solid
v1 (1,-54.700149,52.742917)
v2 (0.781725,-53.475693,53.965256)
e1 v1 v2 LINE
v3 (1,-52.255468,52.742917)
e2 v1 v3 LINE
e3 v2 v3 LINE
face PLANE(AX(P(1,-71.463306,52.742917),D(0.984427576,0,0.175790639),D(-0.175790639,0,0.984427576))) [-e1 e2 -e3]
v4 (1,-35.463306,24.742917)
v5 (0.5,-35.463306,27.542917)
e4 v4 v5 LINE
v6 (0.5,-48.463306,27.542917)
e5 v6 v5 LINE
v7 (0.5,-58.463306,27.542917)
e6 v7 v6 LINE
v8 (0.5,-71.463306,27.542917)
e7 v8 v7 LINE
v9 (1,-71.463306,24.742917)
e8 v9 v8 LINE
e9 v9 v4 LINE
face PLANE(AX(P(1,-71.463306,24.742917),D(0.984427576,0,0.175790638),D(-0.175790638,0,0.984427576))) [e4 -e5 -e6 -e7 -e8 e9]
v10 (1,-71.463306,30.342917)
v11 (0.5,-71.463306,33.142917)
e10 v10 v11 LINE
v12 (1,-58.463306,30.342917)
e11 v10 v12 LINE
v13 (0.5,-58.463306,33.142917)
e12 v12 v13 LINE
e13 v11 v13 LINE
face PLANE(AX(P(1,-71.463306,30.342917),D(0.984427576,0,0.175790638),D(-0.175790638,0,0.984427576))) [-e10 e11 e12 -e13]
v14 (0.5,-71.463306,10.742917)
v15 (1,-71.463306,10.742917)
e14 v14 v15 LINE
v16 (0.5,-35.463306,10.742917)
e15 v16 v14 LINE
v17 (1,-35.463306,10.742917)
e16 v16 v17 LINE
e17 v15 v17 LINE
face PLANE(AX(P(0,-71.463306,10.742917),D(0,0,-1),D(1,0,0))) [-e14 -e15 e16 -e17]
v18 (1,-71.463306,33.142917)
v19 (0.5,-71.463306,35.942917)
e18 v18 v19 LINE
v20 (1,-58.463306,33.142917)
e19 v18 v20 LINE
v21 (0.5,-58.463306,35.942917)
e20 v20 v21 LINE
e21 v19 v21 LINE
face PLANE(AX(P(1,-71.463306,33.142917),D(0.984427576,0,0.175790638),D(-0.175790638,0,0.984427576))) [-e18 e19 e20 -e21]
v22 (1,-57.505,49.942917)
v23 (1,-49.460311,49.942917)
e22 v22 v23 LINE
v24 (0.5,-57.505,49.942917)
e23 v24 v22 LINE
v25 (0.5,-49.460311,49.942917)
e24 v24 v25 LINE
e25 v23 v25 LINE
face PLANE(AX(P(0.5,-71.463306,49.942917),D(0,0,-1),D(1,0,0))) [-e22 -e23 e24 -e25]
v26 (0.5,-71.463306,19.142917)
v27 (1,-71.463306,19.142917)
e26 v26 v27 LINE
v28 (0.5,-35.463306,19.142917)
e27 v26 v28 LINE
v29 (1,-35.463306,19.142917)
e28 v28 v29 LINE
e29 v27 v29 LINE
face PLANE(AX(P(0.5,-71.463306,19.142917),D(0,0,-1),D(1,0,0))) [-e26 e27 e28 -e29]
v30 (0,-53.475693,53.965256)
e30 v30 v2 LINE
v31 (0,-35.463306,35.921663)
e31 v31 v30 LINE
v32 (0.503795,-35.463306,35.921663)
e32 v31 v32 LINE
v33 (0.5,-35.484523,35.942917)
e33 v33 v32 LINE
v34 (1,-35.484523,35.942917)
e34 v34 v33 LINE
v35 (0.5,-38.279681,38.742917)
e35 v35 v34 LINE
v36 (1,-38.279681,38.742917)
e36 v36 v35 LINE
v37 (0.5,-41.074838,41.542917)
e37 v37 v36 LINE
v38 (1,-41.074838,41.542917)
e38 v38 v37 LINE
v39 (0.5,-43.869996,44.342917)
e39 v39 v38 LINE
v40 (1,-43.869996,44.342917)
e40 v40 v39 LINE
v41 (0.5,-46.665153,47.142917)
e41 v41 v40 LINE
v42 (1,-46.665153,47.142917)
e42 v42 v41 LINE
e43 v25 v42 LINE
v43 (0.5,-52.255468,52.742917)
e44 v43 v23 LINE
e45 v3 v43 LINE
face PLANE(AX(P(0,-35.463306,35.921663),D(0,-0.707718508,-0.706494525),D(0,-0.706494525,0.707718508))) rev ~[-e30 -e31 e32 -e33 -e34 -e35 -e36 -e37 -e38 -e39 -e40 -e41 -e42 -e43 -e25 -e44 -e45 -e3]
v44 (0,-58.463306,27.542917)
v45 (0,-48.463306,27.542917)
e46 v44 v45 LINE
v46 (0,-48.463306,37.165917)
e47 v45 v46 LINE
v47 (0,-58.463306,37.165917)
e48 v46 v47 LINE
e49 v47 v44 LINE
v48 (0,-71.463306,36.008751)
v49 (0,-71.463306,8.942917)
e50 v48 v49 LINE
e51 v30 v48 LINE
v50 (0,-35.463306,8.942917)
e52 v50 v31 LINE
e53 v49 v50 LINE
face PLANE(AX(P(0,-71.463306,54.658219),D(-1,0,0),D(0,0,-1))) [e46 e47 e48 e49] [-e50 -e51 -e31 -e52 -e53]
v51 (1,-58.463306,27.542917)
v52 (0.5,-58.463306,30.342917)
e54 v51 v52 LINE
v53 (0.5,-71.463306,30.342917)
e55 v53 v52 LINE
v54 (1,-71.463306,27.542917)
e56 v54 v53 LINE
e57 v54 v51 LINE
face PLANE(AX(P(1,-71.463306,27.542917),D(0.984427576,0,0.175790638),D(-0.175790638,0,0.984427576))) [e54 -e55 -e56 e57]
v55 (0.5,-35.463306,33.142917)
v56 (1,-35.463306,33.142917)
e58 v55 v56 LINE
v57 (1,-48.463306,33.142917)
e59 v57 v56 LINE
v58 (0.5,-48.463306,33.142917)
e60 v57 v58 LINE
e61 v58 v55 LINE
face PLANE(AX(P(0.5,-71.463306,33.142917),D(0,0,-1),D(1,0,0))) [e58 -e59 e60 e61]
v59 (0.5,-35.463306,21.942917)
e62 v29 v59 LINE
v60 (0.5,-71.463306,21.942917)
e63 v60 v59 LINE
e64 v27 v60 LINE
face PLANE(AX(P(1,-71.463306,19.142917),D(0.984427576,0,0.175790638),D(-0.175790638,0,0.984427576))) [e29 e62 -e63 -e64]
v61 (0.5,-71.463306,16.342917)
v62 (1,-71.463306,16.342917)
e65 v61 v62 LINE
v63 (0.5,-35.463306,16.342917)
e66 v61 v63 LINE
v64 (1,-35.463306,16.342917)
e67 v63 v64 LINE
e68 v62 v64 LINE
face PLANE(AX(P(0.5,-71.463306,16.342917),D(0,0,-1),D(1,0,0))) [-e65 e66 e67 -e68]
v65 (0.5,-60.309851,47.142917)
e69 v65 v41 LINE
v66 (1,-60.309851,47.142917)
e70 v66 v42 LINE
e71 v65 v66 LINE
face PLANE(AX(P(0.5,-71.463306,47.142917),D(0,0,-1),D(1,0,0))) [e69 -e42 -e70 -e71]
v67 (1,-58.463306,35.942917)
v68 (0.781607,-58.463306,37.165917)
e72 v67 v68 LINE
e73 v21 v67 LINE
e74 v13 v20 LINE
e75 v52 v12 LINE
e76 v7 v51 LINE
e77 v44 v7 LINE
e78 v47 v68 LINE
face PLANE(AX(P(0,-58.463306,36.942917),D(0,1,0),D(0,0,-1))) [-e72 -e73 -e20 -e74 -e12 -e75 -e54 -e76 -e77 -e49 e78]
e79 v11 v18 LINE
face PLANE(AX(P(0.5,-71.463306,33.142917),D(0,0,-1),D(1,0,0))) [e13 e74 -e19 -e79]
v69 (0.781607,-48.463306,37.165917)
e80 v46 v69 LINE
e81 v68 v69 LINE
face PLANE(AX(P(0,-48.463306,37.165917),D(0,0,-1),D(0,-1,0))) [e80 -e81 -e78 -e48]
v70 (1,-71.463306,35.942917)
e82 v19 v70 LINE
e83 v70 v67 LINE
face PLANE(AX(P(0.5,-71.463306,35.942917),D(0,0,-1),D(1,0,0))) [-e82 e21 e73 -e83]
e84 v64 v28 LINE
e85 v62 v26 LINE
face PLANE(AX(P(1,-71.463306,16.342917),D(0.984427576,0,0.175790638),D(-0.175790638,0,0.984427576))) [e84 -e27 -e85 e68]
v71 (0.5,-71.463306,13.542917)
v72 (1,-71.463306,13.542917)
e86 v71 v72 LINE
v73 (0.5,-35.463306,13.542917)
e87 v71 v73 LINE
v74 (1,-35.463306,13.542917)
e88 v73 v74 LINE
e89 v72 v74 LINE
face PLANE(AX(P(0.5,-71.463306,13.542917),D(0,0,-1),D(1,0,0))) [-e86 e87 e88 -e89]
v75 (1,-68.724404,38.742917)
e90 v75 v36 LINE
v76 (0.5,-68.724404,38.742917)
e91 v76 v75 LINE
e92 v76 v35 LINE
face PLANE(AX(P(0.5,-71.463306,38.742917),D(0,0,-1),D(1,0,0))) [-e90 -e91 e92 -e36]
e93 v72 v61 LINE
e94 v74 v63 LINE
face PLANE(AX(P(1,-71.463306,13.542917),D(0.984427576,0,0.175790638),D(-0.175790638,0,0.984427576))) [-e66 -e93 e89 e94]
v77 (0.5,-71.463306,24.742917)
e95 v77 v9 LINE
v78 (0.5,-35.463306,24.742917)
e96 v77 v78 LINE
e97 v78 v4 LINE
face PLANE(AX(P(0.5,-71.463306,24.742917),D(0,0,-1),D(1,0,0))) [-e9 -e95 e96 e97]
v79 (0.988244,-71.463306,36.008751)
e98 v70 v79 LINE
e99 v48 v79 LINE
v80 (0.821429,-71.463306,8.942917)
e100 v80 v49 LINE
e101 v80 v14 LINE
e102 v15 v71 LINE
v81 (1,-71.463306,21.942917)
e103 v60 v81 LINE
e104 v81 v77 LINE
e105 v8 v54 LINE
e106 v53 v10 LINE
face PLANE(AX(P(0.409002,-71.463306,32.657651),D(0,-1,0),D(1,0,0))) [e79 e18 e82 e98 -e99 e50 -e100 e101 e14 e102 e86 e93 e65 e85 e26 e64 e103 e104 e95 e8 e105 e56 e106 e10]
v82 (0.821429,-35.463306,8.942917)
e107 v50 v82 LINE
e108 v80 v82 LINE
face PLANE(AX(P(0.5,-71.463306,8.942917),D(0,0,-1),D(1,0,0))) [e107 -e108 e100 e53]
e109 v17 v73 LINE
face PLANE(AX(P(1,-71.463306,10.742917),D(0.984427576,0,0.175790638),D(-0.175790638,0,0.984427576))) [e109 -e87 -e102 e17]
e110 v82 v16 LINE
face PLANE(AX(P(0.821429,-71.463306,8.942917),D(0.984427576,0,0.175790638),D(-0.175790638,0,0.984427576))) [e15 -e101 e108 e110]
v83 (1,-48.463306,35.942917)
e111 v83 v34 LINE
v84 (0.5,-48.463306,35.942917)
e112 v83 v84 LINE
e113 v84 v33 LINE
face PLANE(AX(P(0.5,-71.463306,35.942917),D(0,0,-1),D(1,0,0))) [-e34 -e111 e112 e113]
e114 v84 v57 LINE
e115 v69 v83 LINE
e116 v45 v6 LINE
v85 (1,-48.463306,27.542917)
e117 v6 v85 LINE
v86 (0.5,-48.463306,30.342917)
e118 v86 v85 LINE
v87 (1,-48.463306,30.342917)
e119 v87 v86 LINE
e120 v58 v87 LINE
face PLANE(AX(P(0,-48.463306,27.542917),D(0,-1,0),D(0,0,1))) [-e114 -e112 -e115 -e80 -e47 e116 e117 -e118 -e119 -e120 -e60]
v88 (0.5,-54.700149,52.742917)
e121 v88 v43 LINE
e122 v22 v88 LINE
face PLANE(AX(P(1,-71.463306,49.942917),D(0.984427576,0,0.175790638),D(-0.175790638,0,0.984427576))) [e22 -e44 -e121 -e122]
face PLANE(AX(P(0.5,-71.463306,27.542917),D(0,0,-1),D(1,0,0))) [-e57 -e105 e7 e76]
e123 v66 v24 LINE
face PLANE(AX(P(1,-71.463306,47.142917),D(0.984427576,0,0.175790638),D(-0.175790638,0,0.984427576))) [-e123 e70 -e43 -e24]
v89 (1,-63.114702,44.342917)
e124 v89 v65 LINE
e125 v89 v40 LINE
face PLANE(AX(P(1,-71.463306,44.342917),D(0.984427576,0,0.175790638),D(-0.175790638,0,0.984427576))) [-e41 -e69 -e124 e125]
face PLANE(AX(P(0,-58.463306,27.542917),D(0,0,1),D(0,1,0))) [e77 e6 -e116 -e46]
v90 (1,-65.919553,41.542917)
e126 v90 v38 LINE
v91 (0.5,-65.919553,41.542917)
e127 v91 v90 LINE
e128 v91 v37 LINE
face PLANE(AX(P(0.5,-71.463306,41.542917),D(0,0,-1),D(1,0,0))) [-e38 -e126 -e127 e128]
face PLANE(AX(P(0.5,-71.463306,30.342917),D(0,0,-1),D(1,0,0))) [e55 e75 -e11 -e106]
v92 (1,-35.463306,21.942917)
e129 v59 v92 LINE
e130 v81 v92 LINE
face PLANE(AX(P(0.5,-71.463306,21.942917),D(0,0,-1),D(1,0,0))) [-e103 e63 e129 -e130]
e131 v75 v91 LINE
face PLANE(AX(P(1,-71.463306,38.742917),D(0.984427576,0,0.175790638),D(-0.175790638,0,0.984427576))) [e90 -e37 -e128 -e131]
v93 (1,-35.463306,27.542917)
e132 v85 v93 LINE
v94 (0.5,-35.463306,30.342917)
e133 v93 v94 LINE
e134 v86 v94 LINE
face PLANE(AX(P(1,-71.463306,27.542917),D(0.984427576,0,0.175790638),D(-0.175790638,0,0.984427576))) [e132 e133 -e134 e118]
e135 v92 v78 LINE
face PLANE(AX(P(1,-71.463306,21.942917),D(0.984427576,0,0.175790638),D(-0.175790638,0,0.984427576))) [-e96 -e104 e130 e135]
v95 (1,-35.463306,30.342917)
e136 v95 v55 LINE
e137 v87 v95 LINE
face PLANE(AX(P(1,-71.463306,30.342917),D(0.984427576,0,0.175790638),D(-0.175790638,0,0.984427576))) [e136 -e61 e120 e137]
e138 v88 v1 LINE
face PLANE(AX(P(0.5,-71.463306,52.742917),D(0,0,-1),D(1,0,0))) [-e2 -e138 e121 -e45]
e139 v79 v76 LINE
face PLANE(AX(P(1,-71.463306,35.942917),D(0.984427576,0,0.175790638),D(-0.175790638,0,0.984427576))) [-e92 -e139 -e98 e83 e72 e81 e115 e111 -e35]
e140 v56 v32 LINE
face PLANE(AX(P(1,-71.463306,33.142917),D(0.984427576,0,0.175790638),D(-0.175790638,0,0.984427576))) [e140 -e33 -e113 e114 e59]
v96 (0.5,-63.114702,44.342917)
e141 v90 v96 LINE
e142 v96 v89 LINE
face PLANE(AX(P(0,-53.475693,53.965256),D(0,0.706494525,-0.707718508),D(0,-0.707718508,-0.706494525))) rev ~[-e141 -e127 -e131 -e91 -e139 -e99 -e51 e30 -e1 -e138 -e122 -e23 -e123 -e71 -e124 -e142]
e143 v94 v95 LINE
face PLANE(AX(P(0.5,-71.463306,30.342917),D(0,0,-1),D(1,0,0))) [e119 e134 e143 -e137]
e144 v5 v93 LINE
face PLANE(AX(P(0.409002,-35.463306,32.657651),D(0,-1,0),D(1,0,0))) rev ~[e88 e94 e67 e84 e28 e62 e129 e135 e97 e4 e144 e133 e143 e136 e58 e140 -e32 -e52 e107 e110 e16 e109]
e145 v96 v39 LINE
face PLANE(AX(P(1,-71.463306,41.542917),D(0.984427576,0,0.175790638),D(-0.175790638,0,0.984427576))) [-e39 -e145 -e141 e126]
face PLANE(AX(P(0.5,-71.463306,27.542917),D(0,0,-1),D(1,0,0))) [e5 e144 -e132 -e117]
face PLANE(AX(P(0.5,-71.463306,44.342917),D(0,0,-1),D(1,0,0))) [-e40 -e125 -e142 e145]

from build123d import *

# Parameters (mm, degrees)
F1_DEPTH = 0.5
F3_DEPTH = 36
F4_DEPTH = 36
F5_DEPTH = 25
F7_DEPTH = 25
F8_DEPTH = 0.223


with BuildPart() as f1:
    # F0 (on Right) → F1 (new body)
    with BuildSketch(Plane.YZ):
        Polygon((-35.463306278, 10.7429168718), (-71.463306278, 10.7429168718), (-71.463306278, 8.9429168718), (-70.463306278, 8.9429168718), (-36.463306278, 8.9429168718), (-35.463306278, 8.9429168718), align=None)
    extrude(amount=F1_DEPTH)

    # F2 (on face) → F3 (join)
    with BuildSketch(Plane.XZ.offset(71.463306278)):
        Polygon((0.5, 8.9429168718), (0.8214285714, 8.9429168718), (0.5, 10.7429168718), align=None)
    extrude(amount=-F3_DEPTH)

    # F2 (on face) → F4 (join)
    with BuildSketch(Plane.XZ.offset(71.463306278)):
        Polygon((0, 10.7429168718), (0.5, 10.7429168718), (1, 10.7429168718), (0.5, 13.5429168718), (1, 13.5429168718), (0.5, 16.3429168718), (1, 16.3429168718), (0.5, 19.1429168718), (1, 19.1429168718), (0.5, 21.9429168718), (1, 21.9429168718), (0.5, 24.7429168718), (1, 24.7429168718), (0.5, 27.5429168718), (1, 27.5429168718), (0.5, 30.3429168718), (1, 30.3429168718), (0.5, 33.1429168718), (1, 33.1429168718), (0.5, 35.9429168718), (1, 35.9429168718), (0.5, 38.7429168718), (1, 38.7429168718), (0.5, 41.5429168718), (1, 41.5429168718), (0.5, 44.3429168718), (1, 44.3429168718), (0.5, 47.1429168718), (1, 47.1429168718), (0.5, 49.9429168718), (1, 49.9429168718), (0.5, 52.7429168718), (1, 52.7429168718), (0.6579817238, 54.6582192183), (0.5, 54.6582192183), (0, 54.6582192183), align=None)
    extrude(amount=-F4_DEPTH)

    # F0 (on Right) → F5 (cut)
    with BuildSketch(Plane.YZ):
        Polygon((-58.463306278, 36.9429168718), (-58.463306278, 35.9429168718), (-58.463306278, 33.1429168718), (-58.463306278, 30.3429168718), (-58.463306278, 27.5429168718), (-48.463306278, 27.5429168718), (-48.463306278, 30.3429168718), (-48.463306278, 33.1429168718), (-48.463306278, 35.9429168718), (-48.463306278, 36.9429168718), (-57.463306278, 36.9429168718), align=None)
    extrude(amount=F5_DEPTH, mode=Mode.SUBTRACT)

    # F6 (on face) → F7 (cut)
    with BuildSketch(Plane(origin=(0, 0, 0), x_dir=(0, -1, 0), z_dir=(-1, 0, 0))):
        Polygon((35.463306278, 54.6582192183), (35.463306278, 35.9216630459), (53.4756928682, 53.9652556181), (71.463306278, 36.0087513756), (71.463306278, 54.6582192183), align=None)
    extrude(amount=-F7_DEPTH, mode=Mode.SUBTRACT)

    # F8 (cut): a face of the model
    f8_faces = [f1.faces().sort_by_distance(p)[0] for p in [
        (0.4107142857, -53.463306278, 36.9429168718),
    ]]
    extrude(f8_faces, amount=-F8_DEPTH, mode=Mode.SUBTRACT)


solid = f1.part
